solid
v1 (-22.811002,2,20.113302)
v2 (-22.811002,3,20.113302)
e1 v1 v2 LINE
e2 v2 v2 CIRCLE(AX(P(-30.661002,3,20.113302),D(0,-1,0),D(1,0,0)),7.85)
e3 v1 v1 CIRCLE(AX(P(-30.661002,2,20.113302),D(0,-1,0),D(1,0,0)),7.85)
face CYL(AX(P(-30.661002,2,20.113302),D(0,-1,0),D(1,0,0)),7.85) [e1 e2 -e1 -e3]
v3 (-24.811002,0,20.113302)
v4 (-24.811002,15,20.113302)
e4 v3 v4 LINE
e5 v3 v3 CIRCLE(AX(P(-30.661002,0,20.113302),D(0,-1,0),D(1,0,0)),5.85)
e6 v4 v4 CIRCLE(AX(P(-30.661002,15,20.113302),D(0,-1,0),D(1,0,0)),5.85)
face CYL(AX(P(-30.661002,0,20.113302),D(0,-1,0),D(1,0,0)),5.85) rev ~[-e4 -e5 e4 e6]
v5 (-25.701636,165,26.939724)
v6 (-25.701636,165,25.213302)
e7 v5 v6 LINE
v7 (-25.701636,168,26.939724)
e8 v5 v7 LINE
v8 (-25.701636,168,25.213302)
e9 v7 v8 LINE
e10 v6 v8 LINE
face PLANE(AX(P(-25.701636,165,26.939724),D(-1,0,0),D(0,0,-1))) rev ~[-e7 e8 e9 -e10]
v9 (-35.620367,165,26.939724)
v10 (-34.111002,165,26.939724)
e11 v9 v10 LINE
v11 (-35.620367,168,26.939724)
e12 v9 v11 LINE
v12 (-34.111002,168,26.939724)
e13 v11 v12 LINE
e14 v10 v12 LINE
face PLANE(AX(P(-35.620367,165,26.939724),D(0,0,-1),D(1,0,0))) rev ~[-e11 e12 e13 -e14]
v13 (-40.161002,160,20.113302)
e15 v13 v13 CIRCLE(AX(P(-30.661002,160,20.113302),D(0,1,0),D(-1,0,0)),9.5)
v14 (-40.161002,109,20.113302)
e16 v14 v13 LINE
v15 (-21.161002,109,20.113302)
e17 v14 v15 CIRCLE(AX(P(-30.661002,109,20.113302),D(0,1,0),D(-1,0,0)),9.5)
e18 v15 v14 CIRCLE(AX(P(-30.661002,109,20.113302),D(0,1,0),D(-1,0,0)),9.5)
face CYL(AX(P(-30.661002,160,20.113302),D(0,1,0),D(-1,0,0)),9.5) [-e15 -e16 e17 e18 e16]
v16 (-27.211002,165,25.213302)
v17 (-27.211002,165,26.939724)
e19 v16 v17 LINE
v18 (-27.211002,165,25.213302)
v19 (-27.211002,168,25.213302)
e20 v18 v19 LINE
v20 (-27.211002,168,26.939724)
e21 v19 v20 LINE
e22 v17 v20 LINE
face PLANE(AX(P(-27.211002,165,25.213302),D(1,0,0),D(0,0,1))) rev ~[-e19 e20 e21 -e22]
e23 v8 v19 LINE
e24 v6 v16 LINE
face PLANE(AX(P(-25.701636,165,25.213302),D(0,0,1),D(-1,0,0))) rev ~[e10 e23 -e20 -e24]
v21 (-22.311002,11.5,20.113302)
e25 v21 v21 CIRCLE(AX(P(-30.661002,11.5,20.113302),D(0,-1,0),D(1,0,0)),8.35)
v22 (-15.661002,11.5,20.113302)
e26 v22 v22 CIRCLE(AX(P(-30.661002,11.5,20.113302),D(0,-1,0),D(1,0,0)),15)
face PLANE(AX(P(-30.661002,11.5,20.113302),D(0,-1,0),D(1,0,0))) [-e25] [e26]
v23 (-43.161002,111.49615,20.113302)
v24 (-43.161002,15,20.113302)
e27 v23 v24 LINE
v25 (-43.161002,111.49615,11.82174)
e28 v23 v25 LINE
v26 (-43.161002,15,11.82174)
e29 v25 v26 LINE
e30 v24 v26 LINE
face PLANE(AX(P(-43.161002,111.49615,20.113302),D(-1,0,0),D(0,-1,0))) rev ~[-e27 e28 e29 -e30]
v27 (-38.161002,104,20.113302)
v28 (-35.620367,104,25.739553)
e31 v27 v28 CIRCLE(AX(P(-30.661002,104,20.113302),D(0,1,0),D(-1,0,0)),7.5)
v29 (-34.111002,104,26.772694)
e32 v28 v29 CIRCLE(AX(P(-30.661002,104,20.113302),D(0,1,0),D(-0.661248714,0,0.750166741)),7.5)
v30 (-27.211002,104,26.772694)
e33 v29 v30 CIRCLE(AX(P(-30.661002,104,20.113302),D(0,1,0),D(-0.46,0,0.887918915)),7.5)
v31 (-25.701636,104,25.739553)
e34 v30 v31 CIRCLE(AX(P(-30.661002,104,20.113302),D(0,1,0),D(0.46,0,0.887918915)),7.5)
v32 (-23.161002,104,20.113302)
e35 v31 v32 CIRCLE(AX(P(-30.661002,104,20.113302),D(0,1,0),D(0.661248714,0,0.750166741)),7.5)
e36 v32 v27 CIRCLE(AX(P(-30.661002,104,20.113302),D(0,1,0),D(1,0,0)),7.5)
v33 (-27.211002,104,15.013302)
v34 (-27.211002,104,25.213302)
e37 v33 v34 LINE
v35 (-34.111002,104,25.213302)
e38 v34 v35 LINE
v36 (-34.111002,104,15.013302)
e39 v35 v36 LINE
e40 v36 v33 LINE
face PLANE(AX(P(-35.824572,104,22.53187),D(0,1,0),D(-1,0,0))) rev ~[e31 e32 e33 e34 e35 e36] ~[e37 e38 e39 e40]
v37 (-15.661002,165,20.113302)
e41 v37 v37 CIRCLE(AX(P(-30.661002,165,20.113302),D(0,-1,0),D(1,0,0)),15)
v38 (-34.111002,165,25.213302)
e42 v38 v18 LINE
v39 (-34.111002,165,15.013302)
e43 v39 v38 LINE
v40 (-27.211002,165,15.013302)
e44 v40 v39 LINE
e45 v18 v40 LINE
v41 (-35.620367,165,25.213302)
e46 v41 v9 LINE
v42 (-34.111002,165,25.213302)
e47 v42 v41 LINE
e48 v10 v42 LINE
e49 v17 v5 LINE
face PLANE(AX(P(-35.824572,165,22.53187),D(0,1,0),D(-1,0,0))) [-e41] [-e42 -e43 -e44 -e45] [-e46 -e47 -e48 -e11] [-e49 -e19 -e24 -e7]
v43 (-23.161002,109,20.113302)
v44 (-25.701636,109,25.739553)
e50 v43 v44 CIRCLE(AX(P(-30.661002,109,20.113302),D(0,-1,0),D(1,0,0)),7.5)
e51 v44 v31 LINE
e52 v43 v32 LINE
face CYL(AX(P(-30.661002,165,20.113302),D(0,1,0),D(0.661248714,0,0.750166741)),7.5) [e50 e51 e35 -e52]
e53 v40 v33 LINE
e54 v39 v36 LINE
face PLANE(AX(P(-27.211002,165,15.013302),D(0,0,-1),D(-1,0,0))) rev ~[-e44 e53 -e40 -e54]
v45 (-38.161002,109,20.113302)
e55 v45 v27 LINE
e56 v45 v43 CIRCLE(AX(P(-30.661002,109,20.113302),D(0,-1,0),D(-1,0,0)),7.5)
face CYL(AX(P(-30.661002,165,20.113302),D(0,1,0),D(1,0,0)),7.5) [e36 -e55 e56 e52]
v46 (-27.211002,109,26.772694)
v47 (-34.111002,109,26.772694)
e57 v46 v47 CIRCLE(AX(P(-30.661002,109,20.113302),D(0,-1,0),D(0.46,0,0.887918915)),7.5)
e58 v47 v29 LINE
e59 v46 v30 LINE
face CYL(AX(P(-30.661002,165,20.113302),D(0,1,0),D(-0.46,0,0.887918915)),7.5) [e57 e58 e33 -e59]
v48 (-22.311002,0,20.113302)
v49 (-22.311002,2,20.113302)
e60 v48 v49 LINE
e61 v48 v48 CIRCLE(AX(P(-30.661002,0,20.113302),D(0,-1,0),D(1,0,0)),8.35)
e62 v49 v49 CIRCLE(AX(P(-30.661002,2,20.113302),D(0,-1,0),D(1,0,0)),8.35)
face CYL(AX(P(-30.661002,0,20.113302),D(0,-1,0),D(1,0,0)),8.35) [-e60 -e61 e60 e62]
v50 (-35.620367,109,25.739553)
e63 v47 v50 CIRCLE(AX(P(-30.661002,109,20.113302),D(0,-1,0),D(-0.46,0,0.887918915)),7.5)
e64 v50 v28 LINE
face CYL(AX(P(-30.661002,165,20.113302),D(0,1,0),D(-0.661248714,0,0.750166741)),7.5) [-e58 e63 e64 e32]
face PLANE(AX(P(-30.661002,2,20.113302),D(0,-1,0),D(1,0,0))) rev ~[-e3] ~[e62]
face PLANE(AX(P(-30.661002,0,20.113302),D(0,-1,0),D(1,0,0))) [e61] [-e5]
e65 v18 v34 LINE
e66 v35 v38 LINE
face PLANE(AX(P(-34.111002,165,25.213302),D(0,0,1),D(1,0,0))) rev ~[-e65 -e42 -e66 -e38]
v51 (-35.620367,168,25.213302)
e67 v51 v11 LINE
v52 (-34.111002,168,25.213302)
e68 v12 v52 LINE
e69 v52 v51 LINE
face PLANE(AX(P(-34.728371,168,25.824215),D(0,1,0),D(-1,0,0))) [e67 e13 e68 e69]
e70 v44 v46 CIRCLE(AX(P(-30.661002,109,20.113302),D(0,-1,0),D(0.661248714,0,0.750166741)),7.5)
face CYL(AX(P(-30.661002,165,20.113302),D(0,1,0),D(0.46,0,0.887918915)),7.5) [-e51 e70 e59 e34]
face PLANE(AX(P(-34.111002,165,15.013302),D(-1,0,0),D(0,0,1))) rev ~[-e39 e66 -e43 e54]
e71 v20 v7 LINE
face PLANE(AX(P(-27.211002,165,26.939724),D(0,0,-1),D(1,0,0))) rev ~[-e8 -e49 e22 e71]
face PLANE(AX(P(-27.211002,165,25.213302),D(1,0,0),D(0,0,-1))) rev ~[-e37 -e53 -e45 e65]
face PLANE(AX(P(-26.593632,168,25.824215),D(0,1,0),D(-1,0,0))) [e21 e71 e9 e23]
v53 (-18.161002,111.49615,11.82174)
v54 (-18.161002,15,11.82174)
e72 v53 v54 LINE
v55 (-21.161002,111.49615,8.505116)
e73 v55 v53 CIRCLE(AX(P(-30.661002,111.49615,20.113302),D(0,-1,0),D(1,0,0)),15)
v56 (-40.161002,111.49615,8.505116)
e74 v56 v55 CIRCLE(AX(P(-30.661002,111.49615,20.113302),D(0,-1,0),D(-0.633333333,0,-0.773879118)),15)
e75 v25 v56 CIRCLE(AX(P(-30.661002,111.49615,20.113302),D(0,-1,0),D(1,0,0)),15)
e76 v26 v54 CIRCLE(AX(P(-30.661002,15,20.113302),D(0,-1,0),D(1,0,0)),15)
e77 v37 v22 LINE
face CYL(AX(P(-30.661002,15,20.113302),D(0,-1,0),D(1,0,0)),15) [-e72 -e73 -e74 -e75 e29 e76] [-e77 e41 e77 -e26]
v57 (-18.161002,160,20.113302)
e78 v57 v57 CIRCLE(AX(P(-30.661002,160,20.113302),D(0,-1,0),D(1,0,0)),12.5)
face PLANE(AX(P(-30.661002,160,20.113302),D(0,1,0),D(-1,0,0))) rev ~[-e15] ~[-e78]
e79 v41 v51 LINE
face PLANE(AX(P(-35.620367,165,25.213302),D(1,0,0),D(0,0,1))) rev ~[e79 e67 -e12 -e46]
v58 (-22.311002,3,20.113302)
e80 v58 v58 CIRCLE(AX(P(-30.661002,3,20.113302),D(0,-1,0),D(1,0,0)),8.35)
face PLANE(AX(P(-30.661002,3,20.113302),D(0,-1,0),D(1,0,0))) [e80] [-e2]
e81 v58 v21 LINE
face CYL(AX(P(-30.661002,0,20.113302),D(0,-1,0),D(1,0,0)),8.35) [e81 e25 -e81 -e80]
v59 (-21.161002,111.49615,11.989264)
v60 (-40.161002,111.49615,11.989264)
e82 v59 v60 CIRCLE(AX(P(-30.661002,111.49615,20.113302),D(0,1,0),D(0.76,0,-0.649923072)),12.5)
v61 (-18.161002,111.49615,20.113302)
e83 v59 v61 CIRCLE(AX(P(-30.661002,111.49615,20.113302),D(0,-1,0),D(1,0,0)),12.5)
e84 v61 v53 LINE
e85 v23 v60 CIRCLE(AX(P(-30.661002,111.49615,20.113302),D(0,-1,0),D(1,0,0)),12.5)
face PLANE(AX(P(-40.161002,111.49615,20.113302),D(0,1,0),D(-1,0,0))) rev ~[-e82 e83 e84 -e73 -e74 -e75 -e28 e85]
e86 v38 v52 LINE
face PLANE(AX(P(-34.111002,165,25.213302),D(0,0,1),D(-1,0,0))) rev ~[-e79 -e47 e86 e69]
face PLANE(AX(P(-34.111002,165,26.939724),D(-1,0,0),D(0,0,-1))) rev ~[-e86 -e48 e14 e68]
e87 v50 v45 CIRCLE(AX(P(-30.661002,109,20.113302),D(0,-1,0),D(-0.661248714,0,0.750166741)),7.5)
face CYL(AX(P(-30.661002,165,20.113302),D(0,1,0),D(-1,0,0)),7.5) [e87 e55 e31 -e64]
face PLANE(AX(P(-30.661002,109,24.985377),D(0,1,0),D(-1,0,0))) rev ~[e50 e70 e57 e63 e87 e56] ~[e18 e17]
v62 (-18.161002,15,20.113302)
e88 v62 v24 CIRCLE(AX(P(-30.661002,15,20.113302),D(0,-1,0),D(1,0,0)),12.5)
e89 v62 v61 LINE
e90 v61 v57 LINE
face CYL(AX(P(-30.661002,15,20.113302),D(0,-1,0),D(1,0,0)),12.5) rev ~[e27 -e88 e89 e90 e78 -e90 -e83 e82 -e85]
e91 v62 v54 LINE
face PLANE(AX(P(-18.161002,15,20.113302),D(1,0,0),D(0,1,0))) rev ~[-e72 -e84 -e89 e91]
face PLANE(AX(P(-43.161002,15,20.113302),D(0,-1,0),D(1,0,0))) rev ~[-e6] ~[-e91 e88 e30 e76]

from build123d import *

# Parameters (mm, degrees)
F0_R      = 8.35
F0_R_2    = 5.85
F1_DEPTH  = 15
F2_START  = -11.5
F0_R_3    = 15
F0_R_4    = 12.5
F2_DEPTH  = 3.5
F3_START  = -15
F3_DEPTH  = 150
F4_R      = 15
F4_R_2    = 12.5
F5_DEPTH  = 5
F7_START  = -5
F7_DEPTH  = 51
F8_DEPTH  = 61
F6_W      = 2.95
F6_H      = 4.6
F9_DEPTH  = 15.5
F12_DEPTH = 25
F14_DEPTH = 18.0629715323
F15_DEPTH = 3
F17_START = -2
F16_R     = 8.35
F16_R_2   = 7.85
F17_DEPTH = 1


with BuildPart() as f1:
    # F0 (on Front) → F1 (new body)
    with BuildSketch(Plane.XZ):
        with Locations((-30.6610018015, 20.1133023947)):
            Circle(F0_R)
        with Locations((-30.6610018015, 20.1133023947)):
            Circle(F0_R_2, mode=Mode.SUBTRACT)
    extrude(amount=-F1_DEPTH)

    # F0 (on Front) → F2 (join)
    with BuildSketch(Plane.XZ.offset(F2_START)):
        with Locations((-30.6610018015, 20.1133023947)):
            Circle(F0_R_3)
        with Locations((-30.6610018015, 20.1133023947)):
            Circle(F0_R_4, mode=Mode.SUBTRACT)
        with Locations((-30.6610018015, 20.1133023947)):
            Circle(F0_R_4)
        with Locations((-30.6610018015, 20.1133023947)):
            Circle(F0_R, mode=Mode.SUBTRACT)
    extrude(amount=-F2_DEPTH)

    # F0 (on Front) → F3 (join)
    with BuildSketch(Plane.XZ.offset(F3_START)):
        with Locations((-30.6610018015, 20.1133023947)):
            Circle(F0_R_3)
        with Locations((-30.6610018015, 20.1133023947)):
            Circle(F0_R_4, mode=Mode.SUBTRACT)
    extrude(amount=-F3_DEPTH)

    # F4 (on face) → F5 (join)
    with BuildSketch(Plane(origin=(0, 165, 0), x_dir=(-1, 0, 0), z_dir=(0, 1, 0))):
        with Locations((30.6610018015, 20.1133023947)):
            Circle(F4_R)
        with Locations((30.6610018015, 20.1133023947)):
            Circle(F4_R_2, mode=Mode.SUBTRACT)
        with Locations((30.6610018015, 20.1133023947)):
            Circle(F4_R_2)
    extrude(amount=-F5_DEPTH)

    # F6 (on face) → F7 (join)
    with BuildSketch(Plane(origin=(0, 165, 0), x_dir=(-1, 0, 0), z_dir=(0, 1, 0)).offset(F7_START)):
        with BuildLine():
            Line((38.1610018015, 20.1133023947), (40.1610018015, 20.1133023947))
            ThreePointArc((40.1610018015, 20.1133023947), (30.6610018015, 29.6133023947), (21.1610018015, 20.1133023947))
            Line((21.1610018015, 20.1133023947), (23.1610018015, 20.1133023947))
            ThreePointArc((23.1610018015, 20.1133023947), (23.8256071477, 23.1999478111), (25.7016364485, 25.7395529487))
            Line((25.7016364485, 25.7395529487), (25.7016364485, 26.9397236407))
            Line((25.7016364485, 26.9397236407), (27.2110018015, 26.9397236407))
            Line((27.2110018015, 26.9397236407), (27.2110018015, 26.7726942589))
            ThreePointArc((27.2110018015, 26.7726942589), (30.6610018015, 27.6133023947), (34.1110018015, 26.7726942589))
            Line((34.1110018015, 26.7726942589), (34.1110018015, 26.9397236407))
            Line((34.1110018015, 26.9397236407), (35.6203671545, 26.9397236407))
            Line((35.6203671545, 26.9397236407), (35.6203671545, 25.7395529487))
            ThreePointArc((35.6203671545, 25.7395529487), (37.4963964553, 23.1999478111), (38.1610018015, 20.1133023947))
        make_face()
        with BuildLine():
            ThreePointArc((21.1610018015, 20.1133023947), (30.6610018015, 10.6133023947), (40.1610018015, 20.1133023947))
            Line((40.1610018015, 20.1133023947), (38.1610018015, 20.1133023947))
            ThreePointArc((38.1610018015, 20.1133023947), (30.6610018015, 12.6133023947), (23.1610018015, 20.1133023947))
            Line((23.1610018015, 20.1133023947), (21.1610018015, 20.1133023947))
        make_face()
        with BuildLine():
            Line((25.7016364485, 26.9397236407), (25.7016364485, 25.7395529487))
            ThreePointArc((25.7016364485, 25.7395529487), (26.424706055, 26.3023086436), (27.2110018015, 26.7726942589))
            Line((27.2110018015, 26.7726942589), (27.2110018015, 26.9397236407))
            Line((27.2110018015, 26.9397236407), (25.7016364485, 26.9397236407))
        make_face()
        with BuildLine():
            ThreePointArc((34.1110018015, 26.7726942589), (34.897297548, 26.3023086436), (35.6203671545, 25.7395529487))
            Line((35.6203671545, 25.7395529487), (35.6203671545, 26.9397236407))
            Line((35.6203671545, 26.9397236407), (34.1110018015, 26.9397236407))
            Line((34.1110018015, 26.9397236407), (34.1110018015, 26.7726942589))
        make_face()
    extrude(amount=-F7_DEPTH)

    # F6 (on face) → F8 (join)
    with BuildSketch(Plane(origin=(0, 165, 0), x_dir=(-1, 0, 0), z_dir=(0, 1, 0))):
        with BuildLine():
            Line((34.1110018015, 20.1133023947), (38.1610018015, 20.1133023947))
            ThreePointArc((38.1610018015, 20.1133023947), (37.4963964553, 23.1999478111), (35.6203671545, 25.7395529487))
            Line((35.6203671545, 25.7395529487), (35.6203671545, 25.2133023947))
            Line((35.6203671545, 25.2133023947), (34.1110018015, 25.2133023947))
            Line((34.1110018015, 25.2133023947), (34.1110018015, 20.1133023947))
        make_face()
        with BuildLine():
            Line((35.6203671545, 25.2133023947), (35.6203671545, 25.7395529487))
            ThreePointArc((35.6203671545, 25.7395529487), (34.897297548, 26.3023086436), (34.1110018015, 26.7726942589))
            Line((34.1110018015, 26.7726942589), (34.1110018015, 25.2133023947))
            Line((34.1110018015, 25.2133023947), (35.6203671545, 25.2133023947))
        make_face()
        with BuildLine():
            Line((34.1110018015, 25.2133023947), (34.1110018015, 26.7726942589))
            ThreePointArc((34.1110018015, 26.7726942589), (30.6610018015, 27.6133023947), (27.2110018015, 26.7726942589))
            Line((27.2110018015, 26.7726942589), (27.2110018015, 25.2133023947))
            Line((27.2110018015, 25.2133023947), (30.6610018015, 25.2133023947))
            Line((30.6610018015, 25.2133023947), (34.1110018015, 25.2133023947))
        make_face()
        with BuildLine():
            ThreePointArc((27.2110018015, 26.7726942589), (26.424706055, 26.3023086436), (25.7016364485, 25.7395529487))
            Line((25.7016364485, 25.7395529487), (25.7016364485, 25.2133023947))
            Line((25.7016364485, 25.2133023947), (27.2110018015, 25.2133023947))
            Line((27.2110018015, 25.2133023947), (27.2110018015, 26.7726942589))
        make_face()
        with BuildLine():
            ThreePointArc((25.7016364485, 25.7395529487), (23.8256071477, 23.1999478111), (23.1610018015, 20.1133023947))
            Line((23.1610018015, 20.1133023947), (27.2110018015, 20.1133023947))
            Line((27.2110018015, 20.1133023947), (27.2110018015, 25.2133023947))
            Line((27.2110018015, 25.2133023947), (25.7016364485, 25.2133023947))
            Line((25.7016364485, 25.2133023947), (25.7016364485, 25.7395529487))
        make_face()
        with BuildLine():
            ThreePointArc((23.1610018015, 20.1133023947), (30.6610018015, 12.6133023947), (38.1610018015, 20.1133023947))
            Line((38.1610018015, 20.1133023947), (34.1110018015, 20.1133023947))
            Line((34.1110018015, 20.1133023947), (34.1110018015, 15.0133023947))
            Line((34.1110018015, 15.0133023947), (30.6610018015, 15.0133023947))
            Line((30.6610018015, 15.0133023947), (27.2110018015, 15.0133023947))
            Line((27.2110018015, 15.0133023947), (27.2110018015, 20.1133023947))
            Line((27.2110018015, 20.1133023947), (23.1610018015, 20.1133023947))
        make_face()
    extrude(amount=-F8_DEPTH)

    # F6 (on face) → F9 (cut)
    with BuildSketch(Plane(origin=(0, 165, 0), x_dir=(-1, 0, 0), z_dir=(0, 1, 0))):
        with Locations((32.1360018015, 22.4133023947)):
            Rectangle(F6_W, F6_H)
        Polygon((33.6110018015, 20.1133023947), (34.1110018015, 20.1133023947), (34.1110018015, 25.2133023947), (30.6610018015, 25.2133023947), (27.2110018015, 25.2133023947), (27.2110018015, 20.1133023947), (27.7110018015, 20.1133023947), (27.7110018015, 24.7133023947), (30.6610018015, 24.7133023947), (33.6110018015, 24.7133023947), align=None)
        Polygon((33.6110018015, 15.5133023947), (33.6110018015, 20.1133023947), (30.6610018015, 20.1133023947), (27.7110018015, 20.1133023947), (27.7110018015, 15.5133023947), (30.6610018015, 15.5133023947), align=None)
        with Locations((29.1860018015, 22.4133023947)):
            Rectangle(F6_W, F6_H)
        Polygon((34.1110018015, 15.0133023947), (34.1110018015, 20.1133023947), (33.6110018015, 20.1133023947), (33.6110018015, 15.5133023947), (30.6610018015, 15.5133023947), (27.7110018015, 15.5133023947), (27.7110018015, 20.1133023947), (27.2110018015, 20.1133023947), (27.2110018015, 15.0133023947), (30.6610018015, 15.0133023947), align=None)
    extrude(amount=-F9_DEPTH, mode=Mode.SUBTRACT)

    # F11 (on face) → F12 (cut)
    with BuildSketch(Plane.XY.offset(20.1133023947)):
        Polygon((-43.1610018015, 15), (-18.1610018015, 15), (-18.1610018015, 111.4961504936), (-21.1610018015, 111.4961504936), (-21.1610018015, 93.4331789613), (-40.1610018015, 93.4331789613), (-40.1610018015, 111.4961504936), (-43.1610018015, 111.4961504936), align=None)
    extrude(amount=-F12_DEPTH, mode=Mode.SUBTRACT)

    # F13 (on face) → F14 (cut, through all)
    with BuildSketch(Plane.XZ.offset(-93.4331789613)):
        with BuildLine():
            Line((-40.1610018015, 11.9892639901), (-40.1610018015, 8.5051156285))
            ThreePointArc((-40.1610018015, 8.5051156285), (-30.6610018015, 5.1133023947), (-21.1610018015, 8.5051156285))
            Line((-21.1610018015, 8.5051156285), (-21.1610018015, 11.9892639901))
            ThreePointArc((-21.1610018015, 11.9892639901), (-30.6610018015, 7.6133023947), (-40.1610018015, 11.9892639901))
        make_face()
    extrude(amount=-F14_DEPTH, mode=Mode.SUBTRACT)

    # F6 (on face) → F15 (join)
    with BuildSketch(Plane(origin=(0, 165, 0), x_dir=(-1, 0, 0), z_dir=(0, 1, 0))):
        with BuildLine():
            ThreePointArc((27.2110018015, 26.7726942589), (26.424706055, 26.3023086436), (25.7016364485, 25.7395529487))
            Line((25.7016364485, 25.7395529487), (25.7016364485, 25.2133023947))
            Line((25.7016364485, 25.2133023947), (27.2110018015, 25.2133023947))
            Line((27.2110018015, 25.2133023947), (27.2110018015, 26.7726942589))
        make_face()
        with BuildLine():
            Line((25.7016364485, 26.9397236407), (25.7016364485, 25.7395529487))
            ThreePointArc((25.7016364485, 25.7395529487), (26.424706055, 26.3023086436), (27.2110018015, 26.7726942589))
            Line((27.2110018015, 26.7726942589), (27.2110018015, 26.9397236407))
            Line((27.2110018015, 26.9397236407), (25.7016364485, 26.9397236407))
        make_face()
        with BuildLine():
            Line((35.6203671545, 25.2133023947), (35.6203671545, 25.7395529487))
            ThreePointArc((35.6203671545, 25.7395529487), (34.897297548, 26.3023086436), (34.1110018015, 26.7726942589))
            Line((34.1110018015, 26.7726942589), (34.1110018015, 25.2133023947))
            Line((34.1110018015, 25.2133023947), (35.6203671545, 25.2133023947))
        make_face()
        with BuildLine():
            ThreePointArc((34.1110018015, 26.7726942589), (34.897297548, 26.3023086436), (35.6203671545, 25.7395529487))
            Line((35.6203671545, 25.7395529487), (35.6203671545, 26.9397236407))
            Line((35.6203671545, 26.9397236407), (34.1110018015, 26.9397236407))
            Line((34.1110018015, 26.9397236407), (34.1110018015, 26.7726942589))
        make_face()
    extrude(amount=F15_DEPTH)

    # F16 (on face) → F17 (cut)
    with BuildSketch(Plane.XZ.offset(F17_START)):
        with Locations((-30.6610018015, 20.1133023947)):
            Circle(F16_R)
        with Locations((-30.6610018015, 20.1133023947)):
            Circle(F16_R_2, mode=Mode.SUBTRACT)
    extrude(amount=-F17_DEPTH, mode=Mode.SUBTRACT)


solid = f1.part
